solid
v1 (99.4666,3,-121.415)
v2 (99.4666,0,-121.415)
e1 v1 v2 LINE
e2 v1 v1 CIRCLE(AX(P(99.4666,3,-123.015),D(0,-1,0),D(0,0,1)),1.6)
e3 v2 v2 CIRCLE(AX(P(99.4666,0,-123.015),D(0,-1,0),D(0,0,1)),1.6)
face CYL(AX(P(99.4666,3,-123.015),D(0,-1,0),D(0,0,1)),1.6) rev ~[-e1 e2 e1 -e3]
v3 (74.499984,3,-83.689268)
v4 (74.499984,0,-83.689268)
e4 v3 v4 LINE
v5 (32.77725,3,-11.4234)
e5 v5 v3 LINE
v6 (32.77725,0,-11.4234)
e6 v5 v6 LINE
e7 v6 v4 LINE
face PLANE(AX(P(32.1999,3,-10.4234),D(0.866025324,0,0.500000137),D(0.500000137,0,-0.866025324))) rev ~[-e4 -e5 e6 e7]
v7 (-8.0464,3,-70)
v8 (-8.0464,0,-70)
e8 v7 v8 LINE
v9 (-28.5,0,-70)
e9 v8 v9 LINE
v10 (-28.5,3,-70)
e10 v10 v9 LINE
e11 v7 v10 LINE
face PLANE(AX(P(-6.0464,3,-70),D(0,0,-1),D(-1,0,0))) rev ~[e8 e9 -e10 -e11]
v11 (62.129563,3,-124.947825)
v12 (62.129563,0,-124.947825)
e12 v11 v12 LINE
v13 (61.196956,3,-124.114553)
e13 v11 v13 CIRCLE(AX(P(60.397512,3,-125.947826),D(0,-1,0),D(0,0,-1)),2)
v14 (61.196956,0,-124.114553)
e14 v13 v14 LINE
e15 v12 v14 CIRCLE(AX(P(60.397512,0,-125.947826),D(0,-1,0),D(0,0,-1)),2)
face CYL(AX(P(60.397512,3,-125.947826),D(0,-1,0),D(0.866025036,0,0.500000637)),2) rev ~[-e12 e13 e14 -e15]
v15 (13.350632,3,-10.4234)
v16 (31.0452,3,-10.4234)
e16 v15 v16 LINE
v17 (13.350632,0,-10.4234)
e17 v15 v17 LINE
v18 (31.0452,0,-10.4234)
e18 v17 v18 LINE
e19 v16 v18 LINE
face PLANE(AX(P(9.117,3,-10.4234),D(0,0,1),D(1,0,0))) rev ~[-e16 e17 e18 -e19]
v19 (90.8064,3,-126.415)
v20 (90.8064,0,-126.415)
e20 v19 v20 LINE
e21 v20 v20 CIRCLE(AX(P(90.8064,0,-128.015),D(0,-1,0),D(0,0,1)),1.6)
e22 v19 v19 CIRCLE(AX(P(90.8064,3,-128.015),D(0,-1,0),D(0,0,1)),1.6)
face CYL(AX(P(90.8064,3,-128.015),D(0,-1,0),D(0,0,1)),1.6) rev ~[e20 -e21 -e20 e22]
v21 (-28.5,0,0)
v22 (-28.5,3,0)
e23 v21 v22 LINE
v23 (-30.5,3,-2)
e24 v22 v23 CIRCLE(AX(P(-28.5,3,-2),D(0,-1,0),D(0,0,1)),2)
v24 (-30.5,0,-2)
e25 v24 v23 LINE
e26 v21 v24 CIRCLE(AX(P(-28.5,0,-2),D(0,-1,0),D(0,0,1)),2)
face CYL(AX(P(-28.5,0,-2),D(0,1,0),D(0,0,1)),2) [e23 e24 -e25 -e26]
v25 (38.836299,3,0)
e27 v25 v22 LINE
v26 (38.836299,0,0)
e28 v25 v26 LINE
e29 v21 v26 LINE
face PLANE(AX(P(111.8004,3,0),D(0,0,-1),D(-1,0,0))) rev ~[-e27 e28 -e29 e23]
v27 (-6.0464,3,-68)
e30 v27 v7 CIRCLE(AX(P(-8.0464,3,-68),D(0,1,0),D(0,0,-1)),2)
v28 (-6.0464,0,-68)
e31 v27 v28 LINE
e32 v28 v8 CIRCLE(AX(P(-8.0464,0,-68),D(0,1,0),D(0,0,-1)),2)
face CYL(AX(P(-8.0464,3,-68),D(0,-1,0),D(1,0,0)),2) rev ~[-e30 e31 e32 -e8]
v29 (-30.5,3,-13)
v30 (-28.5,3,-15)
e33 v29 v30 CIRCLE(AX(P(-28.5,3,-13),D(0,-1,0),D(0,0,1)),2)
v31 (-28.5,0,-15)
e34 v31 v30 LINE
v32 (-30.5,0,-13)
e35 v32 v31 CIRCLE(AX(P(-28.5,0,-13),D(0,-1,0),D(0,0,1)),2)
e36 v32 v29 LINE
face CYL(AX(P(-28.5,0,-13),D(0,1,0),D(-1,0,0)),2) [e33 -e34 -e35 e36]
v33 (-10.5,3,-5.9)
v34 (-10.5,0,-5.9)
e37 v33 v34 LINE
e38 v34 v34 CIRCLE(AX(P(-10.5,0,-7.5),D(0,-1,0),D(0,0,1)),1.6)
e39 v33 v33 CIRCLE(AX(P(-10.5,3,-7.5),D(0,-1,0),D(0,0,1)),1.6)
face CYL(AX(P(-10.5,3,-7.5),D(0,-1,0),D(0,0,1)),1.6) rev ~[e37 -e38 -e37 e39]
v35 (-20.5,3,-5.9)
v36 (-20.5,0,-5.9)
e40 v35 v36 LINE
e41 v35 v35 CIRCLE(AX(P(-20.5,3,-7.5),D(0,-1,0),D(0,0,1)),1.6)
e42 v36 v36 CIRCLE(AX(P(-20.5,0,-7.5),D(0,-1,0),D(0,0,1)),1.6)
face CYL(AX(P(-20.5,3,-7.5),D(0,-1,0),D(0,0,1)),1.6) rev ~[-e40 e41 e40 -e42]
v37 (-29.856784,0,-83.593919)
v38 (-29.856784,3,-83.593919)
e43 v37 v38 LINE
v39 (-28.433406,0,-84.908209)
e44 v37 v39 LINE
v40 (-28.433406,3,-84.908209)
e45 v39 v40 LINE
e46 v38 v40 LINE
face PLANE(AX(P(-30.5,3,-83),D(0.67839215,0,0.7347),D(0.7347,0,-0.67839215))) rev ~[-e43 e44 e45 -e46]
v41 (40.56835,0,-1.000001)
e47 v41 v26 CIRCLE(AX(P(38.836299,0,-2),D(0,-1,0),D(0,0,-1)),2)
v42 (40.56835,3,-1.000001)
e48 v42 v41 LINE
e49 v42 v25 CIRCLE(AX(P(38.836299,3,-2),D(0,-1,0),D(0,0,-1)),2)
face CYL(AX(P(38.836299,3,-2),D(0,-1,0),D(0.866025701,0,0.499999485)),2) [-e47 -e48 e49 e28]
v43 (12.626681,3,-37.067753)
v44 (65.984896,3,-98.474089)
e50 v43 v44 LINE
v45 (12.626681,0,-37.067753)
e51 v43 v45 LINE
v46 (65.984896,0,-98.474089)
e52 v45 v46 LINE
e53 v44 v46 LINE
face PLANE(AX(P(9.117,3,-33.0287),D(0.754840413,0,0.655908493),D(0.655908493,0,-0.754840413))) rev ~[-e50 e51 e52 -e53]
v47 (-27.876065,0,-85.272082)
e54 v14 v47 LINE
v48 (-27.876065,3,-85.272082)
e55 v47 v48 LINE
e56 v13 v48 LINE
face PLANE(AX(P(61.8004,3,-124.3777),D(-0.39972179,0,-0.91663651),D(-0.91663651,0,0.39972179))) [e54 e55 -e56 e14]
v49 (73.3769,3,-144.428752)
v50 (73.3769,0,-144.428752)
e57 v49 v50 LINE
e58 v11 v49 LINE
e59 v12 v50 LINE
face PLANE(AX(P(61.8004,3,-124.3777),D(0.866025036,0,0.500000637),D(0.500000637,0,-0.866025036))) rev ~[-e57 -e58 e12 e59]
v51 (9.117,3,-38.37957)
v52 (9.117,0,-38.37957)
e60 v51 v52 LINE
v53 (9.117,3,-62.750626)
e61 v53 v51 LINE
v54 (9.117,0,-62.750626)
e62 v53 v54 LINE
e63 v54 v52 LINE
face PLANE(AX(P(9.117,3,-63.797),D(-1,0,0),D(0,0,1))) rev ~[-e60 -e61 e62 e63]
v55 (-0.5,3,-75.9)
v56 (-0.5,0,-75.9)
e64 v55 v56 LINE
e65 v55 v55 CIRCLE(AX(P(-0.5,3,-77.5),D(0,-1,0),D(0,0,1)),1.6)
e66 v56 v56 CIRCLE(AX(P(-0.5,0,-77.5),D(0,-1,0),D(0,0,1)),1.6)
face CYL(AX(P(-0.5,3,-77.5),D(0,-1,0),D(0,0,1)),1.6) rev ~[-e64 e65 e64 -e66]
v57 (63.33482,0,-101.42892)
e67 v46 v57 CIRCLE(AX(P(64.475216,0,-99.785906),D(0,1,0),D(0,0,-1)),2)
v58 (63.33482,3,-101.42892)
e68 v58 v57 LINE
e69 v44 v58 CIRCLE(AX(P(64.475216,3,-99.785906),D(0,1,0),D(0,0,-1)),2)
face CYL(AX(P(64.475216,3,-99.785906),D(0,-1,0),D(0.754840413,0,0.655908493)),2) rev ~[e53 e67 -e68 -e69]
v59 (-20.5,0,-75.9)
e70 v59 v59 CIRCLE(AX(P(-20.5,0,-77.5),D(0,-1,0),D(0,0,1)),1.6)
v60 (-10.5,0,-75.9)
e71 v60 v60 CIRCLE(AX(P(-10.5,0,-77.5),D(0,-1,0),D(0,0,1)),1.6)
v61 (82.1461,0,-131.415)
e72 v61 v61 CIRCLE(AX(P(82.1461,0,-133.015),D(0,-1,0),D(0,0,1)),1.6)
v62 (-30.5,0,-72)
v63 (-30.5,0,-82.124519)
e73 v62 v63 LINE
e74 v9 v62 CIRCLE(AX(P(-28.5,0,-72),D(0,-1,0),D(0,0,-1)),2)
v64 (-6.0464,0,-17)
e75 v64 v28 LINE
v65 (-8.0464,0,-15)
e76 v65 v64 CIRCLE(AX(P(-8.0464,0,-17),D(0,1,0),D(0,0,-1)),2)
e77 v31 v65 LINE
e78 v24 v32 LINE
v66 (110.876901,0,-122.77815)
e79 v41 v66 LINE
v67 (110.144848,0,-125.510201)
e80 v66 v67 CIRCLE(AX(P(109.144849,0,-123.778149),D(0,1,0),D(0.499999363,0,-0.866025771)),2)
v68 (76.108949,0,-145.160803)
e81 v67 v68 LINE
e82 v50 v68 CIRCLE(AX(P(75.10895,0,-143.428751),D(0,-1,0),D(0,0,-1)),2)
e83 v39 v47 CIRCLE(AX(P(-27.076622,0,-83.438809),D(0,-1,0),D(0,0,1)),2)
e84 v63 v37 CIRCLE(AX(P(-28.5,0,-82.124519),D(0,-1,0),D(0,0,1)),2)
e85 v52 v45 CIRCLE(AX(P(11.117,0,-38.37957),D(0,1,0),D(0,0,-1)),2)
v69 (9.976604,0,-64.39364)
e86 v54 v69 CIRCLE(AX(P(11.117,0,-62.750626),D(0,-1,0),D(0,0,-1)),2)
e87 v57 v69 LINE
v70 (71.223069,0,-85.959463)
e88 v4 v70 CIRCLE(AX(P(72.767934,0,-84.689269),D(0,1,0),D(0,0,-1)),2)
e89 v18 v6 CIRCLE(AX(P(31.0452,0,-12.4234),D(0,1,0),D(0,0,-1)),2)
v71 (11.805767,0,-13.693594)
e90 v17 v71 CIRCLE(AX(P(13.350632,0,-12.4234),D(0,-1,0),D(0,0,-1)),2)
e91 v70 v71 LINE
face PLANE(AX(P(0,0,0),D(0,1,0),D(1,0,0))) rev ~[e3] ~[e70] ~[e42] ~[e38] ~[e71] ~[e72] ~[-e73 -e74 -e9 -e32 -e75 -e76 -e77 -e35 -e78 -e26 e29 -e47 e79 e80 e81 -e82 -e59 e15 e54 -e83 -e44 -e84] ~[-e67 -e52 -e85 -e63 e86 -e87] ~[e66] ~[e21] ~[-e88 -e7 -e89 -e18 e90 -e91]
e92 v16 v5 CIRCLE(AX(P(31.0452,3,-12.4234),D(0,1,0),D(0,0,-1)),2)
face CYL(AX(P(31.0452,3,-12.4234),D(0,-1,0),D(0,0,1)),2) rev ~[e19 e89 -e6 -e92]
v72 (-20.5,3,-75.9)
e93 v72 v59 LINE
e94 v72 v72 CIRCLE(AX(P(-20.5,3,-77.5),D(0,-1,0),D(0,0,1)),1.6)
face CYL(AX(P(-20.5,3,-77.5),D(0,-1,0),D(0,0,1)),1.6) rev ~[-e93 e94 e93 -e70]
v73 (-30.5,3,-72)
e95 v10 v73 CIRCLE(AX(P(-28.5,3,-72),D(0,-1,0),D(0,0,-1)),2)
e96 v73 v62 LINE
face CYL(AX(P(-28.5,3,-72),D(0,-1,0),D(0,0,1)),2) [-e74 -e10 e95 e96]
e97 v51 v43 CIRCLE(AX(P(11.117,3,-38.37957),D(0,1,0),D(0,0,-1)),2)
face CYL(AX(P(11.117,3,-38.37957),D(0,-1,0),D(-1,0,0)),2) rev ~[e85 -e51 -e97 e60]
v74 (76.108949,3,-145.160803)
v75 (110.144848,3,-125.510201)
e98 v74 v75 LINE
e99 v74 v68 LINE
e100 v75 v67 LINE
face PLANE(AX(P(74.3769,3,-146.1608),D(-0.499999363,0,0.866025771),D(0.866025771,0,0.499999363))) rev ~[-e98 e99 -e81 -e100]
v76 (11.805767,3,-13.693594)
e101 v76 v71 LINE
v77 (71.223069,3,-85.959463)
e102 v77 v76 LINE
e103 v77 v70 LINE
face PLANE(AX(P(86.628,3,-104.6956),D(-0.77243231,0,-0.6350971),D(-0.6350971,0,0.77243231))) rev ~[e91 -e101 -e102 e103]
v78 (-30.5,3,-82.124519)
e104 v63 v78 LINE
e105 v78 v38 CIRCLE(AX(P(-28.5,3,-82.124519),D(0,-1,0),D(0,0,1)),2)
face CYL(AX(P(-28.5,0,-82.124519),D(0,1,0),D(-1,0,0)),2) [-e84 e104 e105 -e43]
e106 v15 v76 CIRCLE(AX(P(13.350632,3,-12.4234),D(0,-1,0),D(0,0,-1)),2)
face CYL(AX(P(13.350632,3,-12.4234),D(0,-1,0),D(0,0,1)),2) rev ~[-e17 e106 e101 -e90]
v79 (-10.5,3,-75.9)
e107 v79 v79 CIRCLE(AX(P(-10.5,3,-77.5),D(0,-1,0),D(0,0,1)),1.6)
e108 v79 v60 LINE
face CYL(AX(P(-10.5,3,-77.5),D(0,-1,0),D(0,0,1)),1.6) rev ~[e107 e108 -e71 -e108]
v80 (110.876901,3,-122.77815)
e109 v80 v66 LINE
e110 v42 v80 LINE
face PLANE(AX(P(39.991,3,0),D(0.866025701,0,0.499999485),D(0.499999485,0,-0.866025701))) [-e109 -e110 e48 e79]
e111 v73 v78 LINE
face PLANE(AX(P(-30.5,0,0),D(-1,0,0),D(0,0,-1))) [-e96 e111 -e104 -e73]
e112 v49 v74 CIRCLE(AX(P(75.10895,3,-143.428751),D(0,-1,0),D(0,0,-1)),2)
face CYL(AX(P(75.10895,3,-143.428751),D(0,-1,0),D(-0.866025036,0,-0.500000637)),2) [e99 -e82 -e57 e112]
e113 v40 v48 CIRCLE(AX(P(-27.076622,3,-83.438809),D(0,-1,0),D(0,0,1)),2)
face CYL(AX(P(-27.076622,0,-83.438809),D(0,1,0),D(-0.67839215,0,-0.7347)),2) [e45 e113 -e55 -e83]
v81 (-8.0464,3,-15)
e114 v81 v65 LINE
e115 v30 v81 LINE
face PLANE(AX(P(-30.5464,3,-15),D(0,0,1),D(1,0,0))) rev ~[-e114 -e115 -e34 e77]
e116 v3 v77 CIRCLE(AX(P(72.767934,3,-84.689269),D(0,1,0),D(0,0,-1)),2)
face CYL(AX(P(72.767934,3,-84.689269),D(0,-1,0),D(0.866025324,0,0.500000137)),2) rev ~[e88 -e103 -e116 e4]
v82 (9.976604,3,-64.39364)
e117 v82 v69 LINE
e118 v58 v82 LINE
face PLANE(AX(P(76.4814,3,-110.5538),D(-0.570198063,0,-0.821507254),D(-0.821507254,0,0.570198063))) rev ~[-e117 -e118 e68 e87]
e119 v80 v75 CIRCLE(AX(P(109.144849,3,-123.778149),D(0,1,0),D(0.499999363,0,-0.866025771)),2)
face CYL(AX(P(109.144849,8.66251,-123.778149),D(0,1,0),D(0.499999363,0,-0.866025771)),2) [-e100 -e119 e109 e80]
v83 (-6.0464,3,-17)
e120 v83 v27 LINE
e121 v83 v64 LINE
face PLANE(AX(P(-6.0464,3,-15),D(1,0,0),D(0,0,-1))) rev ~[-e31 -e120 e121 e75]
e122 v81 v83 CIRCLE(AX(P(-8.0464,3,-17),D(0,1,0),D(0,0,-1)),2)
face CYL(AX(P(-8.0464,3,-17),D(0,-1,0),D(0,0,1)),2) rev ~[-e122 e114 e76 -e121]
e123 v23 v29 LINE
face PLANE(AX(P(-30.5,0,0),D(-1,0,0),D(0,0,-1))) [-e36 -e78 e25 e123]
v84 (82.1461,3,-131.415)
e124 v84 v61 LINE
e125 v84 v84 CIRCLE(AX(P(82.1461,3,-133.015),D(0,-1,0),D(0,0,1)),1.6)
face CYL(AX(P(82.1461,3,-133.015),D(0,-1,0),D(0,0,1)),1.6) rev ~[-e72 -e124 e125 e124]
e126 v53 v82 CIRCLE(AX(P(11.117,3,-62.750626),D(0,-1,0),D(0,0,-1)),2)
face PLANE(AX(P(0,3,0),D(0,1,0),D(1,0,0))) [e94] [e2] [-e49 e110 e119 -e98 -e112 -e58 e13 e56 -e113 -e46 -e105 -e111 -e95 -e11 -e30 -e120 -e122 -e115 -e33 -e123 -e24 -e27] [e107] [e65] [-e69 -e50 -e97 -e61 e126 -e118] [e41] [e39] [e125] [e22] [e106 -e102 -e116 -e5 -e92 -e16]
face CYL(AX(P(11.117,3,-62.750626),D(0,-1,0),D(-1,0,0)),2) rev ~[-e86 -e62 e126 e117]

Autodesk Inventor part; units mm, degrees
ref_plane "YZ Plane" through (0, 0, 0) normal (1, 0, 0) x (0, 1, 0)
ref_plane "XZ Plane" through (0, 0, 0) normal (0, 1, 0) x (-1, 0, 0)
ref_plane "XY Plane" through (0, 0, 0) normal (0, 0, 1) x (1, 0, 0)
sketch "スケッチ1" plane through (0, 0, 0) normal (0, 1, 0) x (-1, 0, 0)
  line L0 (0, 0) -> (30.5, 0)
  line L1 (30.5, 0) -> (30.5, -85)
  line L2 (30.5, -85) -> (0, -85)
  line L3 (0, -85) -> (0, 0)
  dimension "d0" = 30.5
  dimension "d1" = 85
extrude "押し出し1" add sketch "スケッチ1" along normal blind 3
sketch "スケッチ2" plane through (0, 3, 0) normal (0, 1, 0) x (1, 0, 0)
  line L0 (-30.5464, 15) -> (-6.0464, 15)
  line L1 (-6.0464, 15) -> (-6.0464, 70)
  line L2 (-6.0464, 70) -> (-30.5464, 70)
  line L3 (-30.5, 0) -> (0, 0) projected
  line L4 (-30.5464, 15) -> (-30.5464, 70)
  dimension "d4" = 24.5
  dimension "d5" = 55
  dimension "d6" = 90
  dimension "d7" = 15
extrude "押し出し2" cut sketch "スケッチ2" against normal blind 3
fillet "フィレット1" radius 2 4 edges at (-30.5, 1.5, 0) (-30.5, 1.5, -70) (-30.5, 1.5, -85) (-30.5, 1.5, -15)
fillet "フィレット2" radius 2 2 edges at (-6.0464, 1.5, -15) (-6.0464, 1.5, -70)
sketch "スケッチ3" plane through (0, 3, 0) normal (0, 1, 0) x (1, 0, 0)
  line L0 (-28.5, 0) -> (0, 0) projected
  line L1 (0, 0) -> (100, 0)
  line L2 (100, 0) -> (100, 85)
  line L3 (100, 85) -> (0, 85)
  line L4 (0, 85) -> (0, 0)
  dimension "d12" = 100
  dimension "d13" = 85
extrude "押し出し3" add sketch "スケッチ3" against normal blind 3
sketch "スケッチ4" plane through (0, 3, 0) normal (0, 1, 0) x (1, 0, 0)
  line L0 (100, 0) -> (100, 85) projected
  point P0 (0, 0)
  point P1 (40, 0)
  dimension "d16" = 60
sketch "スケッチ5" plane through (0, 3, 0) normal (0, 1, 0) x (1, 0, 0)
  line L0 (-28.5, 0) -> (100, 0) projected
  line L1 (39.9909, 0) -> (111.8004, 124.3777)
  line L2 (39.9909, 0) -> (183.6099, 0) construction
  line L3 (111.8004, 124.3777) -> (61.8004, 124.3777)
  line L4 (61.8004, 124.3777) -> (-28.5, 85)
  line L5 (-28.5, 85) -> (89.0656, 85)
  line L6 (100, 85) -> (-28.5, 85) projected
  point P0 (0, 0)
  dimension "d17" = 143.619
  dimension "d18" = 60
  dimension "d19" = 50
extrude "押し出し4" add sketch "スケッチ5" against normal blind 3
sketch "スケッチ6" plane through (0, 3, 0) normal (0, 1, 0) x (1, 0, 0)
  line L0 (111.8004, 124.3777) -> (61.8004, 124.3777) projected
  line L1 (111.8004, 124.3777) -> (111.8004, 0)
  line L2 (111.8004, 124.3777) -> (236.1781, 124.3777) construction
  line L3 (100, 0) -> (100, 85) projected
  line L4 (111.8004, 0) -> (100, 0)
  line L5 (100, 0) -> (100, 85)
  line L6 (100, 85) -> (89.0656, 85) projected
  line L7 (100, 85) -> (89.0656, 85)
  line L8 (89.0656, 85) -> (111.8004, 124.3777) projected
  line L9 (89.0656, 85) -> (111.8004, 124.3777)
  point P0 (0, 0)
  dimension "d22" = 90
extrude "押し出し5" add sketch "スケッチ6" against normal blind 3
sketch "スケッチ7" plane through (0, 3, 0) normal (0, 1, 0) x (1, 0, 0)
  line L0 (111.8004, 124.3777) -> (111.8004, 0) projected
  line L1 (111.8004, 109.3777) -> (39.991, 0)
  line L2 (-28.5, 0) -> (111.8004, 0) projected
  line L3 (111.8004, 0) -> (111.8004, 109.3777)
  line L4 (111.8004, 0) -> (39.991, 0)
  point P0 (0, 0)
  dimension "d25" = 15
extrude "押し出し6" cut sketch "スケッチ7" against normal blind 3
sketch "スケッチ8" plane through (0, 3, 0) normal (0, 1, 0) x (1, 0, 0)
  line L0 (111.8004, 109.3777) -> (111.8004, 124.3777) projected
  point P0 (0, 0)
  point P1 (111.8004, 116.8777)
sketch "スケッチ9" plane through (0, 3, 0) normal (0, 1, 0) x (1, 0, 0)
  point P0 (0, 0)
sketch "スケッチ10" plane through (0, 3, 0) normal (0, 1, 0) x (1, 0, 0)
  line L0 (111.8004, 109.3777) -> (39.991, 0) projected
  line L1 (61.8004, 124.3777) -> (111.8004, 124.3777) projected
  line L2 (39.991, 0) -> (111.8004, 124.3777)
  line L3 (111.8004, 109.3777) -> (111.8004, 124.3777) projected
  line L4 (111.8004, 124.3777) -> (111.8004, 109.3777)
  line L5 (111.8004, 109.3777) -> (39.991, 0)
  point P0 (0, 0)
extrude "押し出し7" cut sketch "スケッチ10" against normal blind 3
sketch "スケッチ11" plane through (0, 3, 0) normal (0, 1, 0) x (1, 0, 0)
  line L0 (61.8004, 124.3777) -> (74.3769, 146.1608)
  line L1 (61.8004, 124.3777) -> (86.9534, 124.3777) construction
  line L2 (74.3769, 146.1608) -> (112.1064, 124.3777)
  line L3 (111.8004, 124.3777) -> (61.8004, 124.3777) projected
  line L4 (112.1064, 124.3777) -> (61.8004, 124.3777)
  point P0 (0, 0)
  dimension "d32" = 25.153
  dimension "d33" = 60
extrude "押し出し8" add sketch "スケッチ11" against normal blind 3
fillet "フィレット3" radius 2 2 edges at (112.1064, 1.5, -124.3777) (111.8004, 1.5, -124.3777)
fillet "フィレット4" radius 2 3 edges at (74.3769, 1.5, -146.1608) (61.8004, 1.5, -124.3777) (39.991, 1.5, 0)
sketch "スケッチ12" plane through (0, 3, 0) normal (0, 1, 0) x (1, 0, 0)
  circle A0 centre (99.4666, 123.015) radius 1.6
  line L0 (110.1448, 125.5102) -> (76.1089, 145.1608) projected
  line L1 (40.5683, 1) -> (110.8769, 122.7782) projected
  circle A1 centre (89.4666, 128.7885) radius 1.6
  circle A2 centre (79.4666, 134.562) radius 1.6
  point P0 (0, 0)
  dimension "d38" = 3.2
  dimension "d39" = 7.5
  dimension "d40" = 10
  dimension "d41" = 3.2
  dimension "d42" = 3.2
  dimension "d43" = 10
  dimension "d44" = 7.5
  dimension "d45" = 7.5
  dimension "d46" = 10
hole "穴1" at (99.4666, 3, -123.015) at (89.4666, 3, -128.7885) at (79.4666, 3, -134.562) direction (0, -1, 0) diameter 3.2 depth 3.048
fillet "フィレット5" radius 2 1 edges at (-28.5, 1.5, -85)
sketch "スケッチ13" plane through (0, 3, 0) normal (0, 1, 0) x (1, 0, 0)
  line L0 (-30.5, 83) -> (-30.5, 72) projected
  line L1 (-28.1853, 85.1373) -> (61.1969, 124.1146) projected
  line L2 (-30.5, 83) -> (-28.1853, 85.1373)
  line L3 (-28.1853, 85.1373) -> (-30.5, 84.8107)
  arc A0 (-28.7424, 84.9853) -> (-30.5, 83) centre (-28.5, 83) ccw projected
  line L4 (-30.5, 84.8107) -> (-30.5, 83)
  point P0 (0, 0)
extrude "押し出し9" cut sketch "スケッチ13" against normal blind 3
fillet "フィレット6" radius 2 2 edges at (-28.1853, 1.5, -85.1373) (-30.5, 1.5, -83)
sketch "スケッチ14" plane through (0, 3, 0) normal (0, 1, 0) x (1, 0, 0)
  circle A0 centre (-20.5, 77.5) radius 1.6
  line L0 (-30.5, 82.1245) -> (-30.5, 72) projected
  line L1 (-28.5, 70) -> (-8.0464, 70) projected
  circle A1 centre (-10.5, 77.5) radius 1.6
  circle A2 centre (-0.5, 77.5) radius 1.6
  circle A3 centre (-20.5, 7.5) radius 1.6
  line L2 (-8.0464, 15) -> (-28.5, 15) projected
  line L3 (-30.5, 13) -> (-30.5, 2) projected
  circle A4 centre (-10.5, 7.5) radius 1.6
  point P0 (0, 0)
  dimension "d58" = 3.2
  dimension "d59" = 10
  dimension "d60" = 7.5
  dimension "d61" = 3.2
  dimension "d62" = 3.2
  dimension "d63" = 10
  dimension "d64" = 7.5
  dimension "d65" = 10
  dimension "d66" = 7.5
  dimension "d67" = 3.2
  dimension "d68" = 7.5
  dimension "d69" = 10
  dimension "d70" = 3.2
  dimension "d71" = 10
  dimension "d72" = 7.5
hole "穴2" at (-20.5, 3, -7.5) at (-10.5, 3, -7.5) at (-20.5, 3, -77.5) at (-10.5, 3, -77.5) at (-0.5, 3, -77.5) direction (0, -1, 0) diameter 3.2 depth 3.048
sketch "スケッチ15" plane through (0, 3, 0) normal (0, 1, 0) x (1, 0, 0)
  line L0 (32.1999, 10.4234) -> (86.628, 104.6956)
  line L1 (32.1999, 10.4234) -> (141.0561, 10.4234) construction
  line L2 (86.628, 104.6956) -> (9.117, 10.4234)
  line L3 (9.117, 10.4234) -> (32.1999, 10.4234)
  line L4 (9.117, 33.0287) -> (76.4814, 110.5538)
  line L5 (76.4814, 110.5538) -> (9.117, 63.797)
  line L6 (9.117, 63.797) -> (9.117, 33.0287)
  point P0 (0, 0)
  dimension "d80" = 60
extrude "押し出し10" cut sketch "スケッチ15" against normal blind 3
fillet "フィレット7" radius 2 6 edges at (9.117, 1.5, -63.797) (9.117, 1.5, -10.4234) (32.1999, 1.5, -10.4234) (9.117, 1.5, -33.0287) (76.4814, 1.5, -110.5538) (86.628, 1.5, -104.6956)
sketch "スケッチ16" plane through (0, 3, 0) normal (0, 1, 0) x (1, 0, 0)
  circle A0 centre (99.4666, 123.015) radius 1.6 projected
  circle A1 centre (99.4666, 123.015) radius 1.6
  circle A2 centre (89.4666, 128.7885) radius 1.6 projected
  circle A3 centre (89.4666, 128.7885) radius 1.6
  circle A4 centre (79.4666, 134.562) radius 1.6 projected
  circle A5 centre (79.4666, 134.562) radius 1.6
  point P0 (0, 0)
  dimension "d84" = 3.2
  dimension "d85" = 3.2
  dimension "d86" = 3.2
extrude "押し出し11" add sketch "スケッチ16" against normal blind 3
sketch "スケッチ17" plane through (0, 3, 0) normal (0, 1, 0) x (1, 0, 0)
  circle A0 centre (99.4666, 123.015) radius 1.6
  line L0 (110.1448, 125.5102) -> (76.1089, 145.1608) projected
  line L1 (40.5683, 1) -> (110.8769, 122.7782) projected
  circle A1 centre (90.8064, 128.015) radius 1.6
  circle A2 centre (82.1461, 133.015) radius 1.6
  point P0 (0, 0)
  dimension "d89" = 3.2
  dimension "d90" = 7.5
  dimension "d91" = 10
  dimension "d92" = 3.2
  dimension "d93" = 3.2
  dimension "d95" = 7.5
  dimension "d97" = 7.5
  dimension "d98" = 20
  dimension "d99" = 30
hole "穴3" at (82.1461, 3, -133.015) at (90.8064, 3, -128.015) at (99.4666, 3, -123.015) direction (0, -1, 0) diameter 3.2 depth 3.048
equation "\"d52\" = Thickness"
equation "\"d78\" = Thickness"
equation "\"d105\" = Thickness"
equation "\"BendRadius\" = Thickness"
equation "\"BendReliefWidth\" = Thickness"
equation "\"BendReliefDepth\" = 0.5 * Thickness"
equation "\"CornerReliefSize\" = 4 * Thickness"
equation "\"MinimumRemnant\" = 2 * Thickness"
equation "\"TransitionRadius\" = BendRadius"
equation "\"JacobiRadiusSize\" = BendRadius"
equation "\"GapSize\" = Thickness"
equation "\"Thickness\" = 3.048"
properties part number "オムニ_前2_N"
